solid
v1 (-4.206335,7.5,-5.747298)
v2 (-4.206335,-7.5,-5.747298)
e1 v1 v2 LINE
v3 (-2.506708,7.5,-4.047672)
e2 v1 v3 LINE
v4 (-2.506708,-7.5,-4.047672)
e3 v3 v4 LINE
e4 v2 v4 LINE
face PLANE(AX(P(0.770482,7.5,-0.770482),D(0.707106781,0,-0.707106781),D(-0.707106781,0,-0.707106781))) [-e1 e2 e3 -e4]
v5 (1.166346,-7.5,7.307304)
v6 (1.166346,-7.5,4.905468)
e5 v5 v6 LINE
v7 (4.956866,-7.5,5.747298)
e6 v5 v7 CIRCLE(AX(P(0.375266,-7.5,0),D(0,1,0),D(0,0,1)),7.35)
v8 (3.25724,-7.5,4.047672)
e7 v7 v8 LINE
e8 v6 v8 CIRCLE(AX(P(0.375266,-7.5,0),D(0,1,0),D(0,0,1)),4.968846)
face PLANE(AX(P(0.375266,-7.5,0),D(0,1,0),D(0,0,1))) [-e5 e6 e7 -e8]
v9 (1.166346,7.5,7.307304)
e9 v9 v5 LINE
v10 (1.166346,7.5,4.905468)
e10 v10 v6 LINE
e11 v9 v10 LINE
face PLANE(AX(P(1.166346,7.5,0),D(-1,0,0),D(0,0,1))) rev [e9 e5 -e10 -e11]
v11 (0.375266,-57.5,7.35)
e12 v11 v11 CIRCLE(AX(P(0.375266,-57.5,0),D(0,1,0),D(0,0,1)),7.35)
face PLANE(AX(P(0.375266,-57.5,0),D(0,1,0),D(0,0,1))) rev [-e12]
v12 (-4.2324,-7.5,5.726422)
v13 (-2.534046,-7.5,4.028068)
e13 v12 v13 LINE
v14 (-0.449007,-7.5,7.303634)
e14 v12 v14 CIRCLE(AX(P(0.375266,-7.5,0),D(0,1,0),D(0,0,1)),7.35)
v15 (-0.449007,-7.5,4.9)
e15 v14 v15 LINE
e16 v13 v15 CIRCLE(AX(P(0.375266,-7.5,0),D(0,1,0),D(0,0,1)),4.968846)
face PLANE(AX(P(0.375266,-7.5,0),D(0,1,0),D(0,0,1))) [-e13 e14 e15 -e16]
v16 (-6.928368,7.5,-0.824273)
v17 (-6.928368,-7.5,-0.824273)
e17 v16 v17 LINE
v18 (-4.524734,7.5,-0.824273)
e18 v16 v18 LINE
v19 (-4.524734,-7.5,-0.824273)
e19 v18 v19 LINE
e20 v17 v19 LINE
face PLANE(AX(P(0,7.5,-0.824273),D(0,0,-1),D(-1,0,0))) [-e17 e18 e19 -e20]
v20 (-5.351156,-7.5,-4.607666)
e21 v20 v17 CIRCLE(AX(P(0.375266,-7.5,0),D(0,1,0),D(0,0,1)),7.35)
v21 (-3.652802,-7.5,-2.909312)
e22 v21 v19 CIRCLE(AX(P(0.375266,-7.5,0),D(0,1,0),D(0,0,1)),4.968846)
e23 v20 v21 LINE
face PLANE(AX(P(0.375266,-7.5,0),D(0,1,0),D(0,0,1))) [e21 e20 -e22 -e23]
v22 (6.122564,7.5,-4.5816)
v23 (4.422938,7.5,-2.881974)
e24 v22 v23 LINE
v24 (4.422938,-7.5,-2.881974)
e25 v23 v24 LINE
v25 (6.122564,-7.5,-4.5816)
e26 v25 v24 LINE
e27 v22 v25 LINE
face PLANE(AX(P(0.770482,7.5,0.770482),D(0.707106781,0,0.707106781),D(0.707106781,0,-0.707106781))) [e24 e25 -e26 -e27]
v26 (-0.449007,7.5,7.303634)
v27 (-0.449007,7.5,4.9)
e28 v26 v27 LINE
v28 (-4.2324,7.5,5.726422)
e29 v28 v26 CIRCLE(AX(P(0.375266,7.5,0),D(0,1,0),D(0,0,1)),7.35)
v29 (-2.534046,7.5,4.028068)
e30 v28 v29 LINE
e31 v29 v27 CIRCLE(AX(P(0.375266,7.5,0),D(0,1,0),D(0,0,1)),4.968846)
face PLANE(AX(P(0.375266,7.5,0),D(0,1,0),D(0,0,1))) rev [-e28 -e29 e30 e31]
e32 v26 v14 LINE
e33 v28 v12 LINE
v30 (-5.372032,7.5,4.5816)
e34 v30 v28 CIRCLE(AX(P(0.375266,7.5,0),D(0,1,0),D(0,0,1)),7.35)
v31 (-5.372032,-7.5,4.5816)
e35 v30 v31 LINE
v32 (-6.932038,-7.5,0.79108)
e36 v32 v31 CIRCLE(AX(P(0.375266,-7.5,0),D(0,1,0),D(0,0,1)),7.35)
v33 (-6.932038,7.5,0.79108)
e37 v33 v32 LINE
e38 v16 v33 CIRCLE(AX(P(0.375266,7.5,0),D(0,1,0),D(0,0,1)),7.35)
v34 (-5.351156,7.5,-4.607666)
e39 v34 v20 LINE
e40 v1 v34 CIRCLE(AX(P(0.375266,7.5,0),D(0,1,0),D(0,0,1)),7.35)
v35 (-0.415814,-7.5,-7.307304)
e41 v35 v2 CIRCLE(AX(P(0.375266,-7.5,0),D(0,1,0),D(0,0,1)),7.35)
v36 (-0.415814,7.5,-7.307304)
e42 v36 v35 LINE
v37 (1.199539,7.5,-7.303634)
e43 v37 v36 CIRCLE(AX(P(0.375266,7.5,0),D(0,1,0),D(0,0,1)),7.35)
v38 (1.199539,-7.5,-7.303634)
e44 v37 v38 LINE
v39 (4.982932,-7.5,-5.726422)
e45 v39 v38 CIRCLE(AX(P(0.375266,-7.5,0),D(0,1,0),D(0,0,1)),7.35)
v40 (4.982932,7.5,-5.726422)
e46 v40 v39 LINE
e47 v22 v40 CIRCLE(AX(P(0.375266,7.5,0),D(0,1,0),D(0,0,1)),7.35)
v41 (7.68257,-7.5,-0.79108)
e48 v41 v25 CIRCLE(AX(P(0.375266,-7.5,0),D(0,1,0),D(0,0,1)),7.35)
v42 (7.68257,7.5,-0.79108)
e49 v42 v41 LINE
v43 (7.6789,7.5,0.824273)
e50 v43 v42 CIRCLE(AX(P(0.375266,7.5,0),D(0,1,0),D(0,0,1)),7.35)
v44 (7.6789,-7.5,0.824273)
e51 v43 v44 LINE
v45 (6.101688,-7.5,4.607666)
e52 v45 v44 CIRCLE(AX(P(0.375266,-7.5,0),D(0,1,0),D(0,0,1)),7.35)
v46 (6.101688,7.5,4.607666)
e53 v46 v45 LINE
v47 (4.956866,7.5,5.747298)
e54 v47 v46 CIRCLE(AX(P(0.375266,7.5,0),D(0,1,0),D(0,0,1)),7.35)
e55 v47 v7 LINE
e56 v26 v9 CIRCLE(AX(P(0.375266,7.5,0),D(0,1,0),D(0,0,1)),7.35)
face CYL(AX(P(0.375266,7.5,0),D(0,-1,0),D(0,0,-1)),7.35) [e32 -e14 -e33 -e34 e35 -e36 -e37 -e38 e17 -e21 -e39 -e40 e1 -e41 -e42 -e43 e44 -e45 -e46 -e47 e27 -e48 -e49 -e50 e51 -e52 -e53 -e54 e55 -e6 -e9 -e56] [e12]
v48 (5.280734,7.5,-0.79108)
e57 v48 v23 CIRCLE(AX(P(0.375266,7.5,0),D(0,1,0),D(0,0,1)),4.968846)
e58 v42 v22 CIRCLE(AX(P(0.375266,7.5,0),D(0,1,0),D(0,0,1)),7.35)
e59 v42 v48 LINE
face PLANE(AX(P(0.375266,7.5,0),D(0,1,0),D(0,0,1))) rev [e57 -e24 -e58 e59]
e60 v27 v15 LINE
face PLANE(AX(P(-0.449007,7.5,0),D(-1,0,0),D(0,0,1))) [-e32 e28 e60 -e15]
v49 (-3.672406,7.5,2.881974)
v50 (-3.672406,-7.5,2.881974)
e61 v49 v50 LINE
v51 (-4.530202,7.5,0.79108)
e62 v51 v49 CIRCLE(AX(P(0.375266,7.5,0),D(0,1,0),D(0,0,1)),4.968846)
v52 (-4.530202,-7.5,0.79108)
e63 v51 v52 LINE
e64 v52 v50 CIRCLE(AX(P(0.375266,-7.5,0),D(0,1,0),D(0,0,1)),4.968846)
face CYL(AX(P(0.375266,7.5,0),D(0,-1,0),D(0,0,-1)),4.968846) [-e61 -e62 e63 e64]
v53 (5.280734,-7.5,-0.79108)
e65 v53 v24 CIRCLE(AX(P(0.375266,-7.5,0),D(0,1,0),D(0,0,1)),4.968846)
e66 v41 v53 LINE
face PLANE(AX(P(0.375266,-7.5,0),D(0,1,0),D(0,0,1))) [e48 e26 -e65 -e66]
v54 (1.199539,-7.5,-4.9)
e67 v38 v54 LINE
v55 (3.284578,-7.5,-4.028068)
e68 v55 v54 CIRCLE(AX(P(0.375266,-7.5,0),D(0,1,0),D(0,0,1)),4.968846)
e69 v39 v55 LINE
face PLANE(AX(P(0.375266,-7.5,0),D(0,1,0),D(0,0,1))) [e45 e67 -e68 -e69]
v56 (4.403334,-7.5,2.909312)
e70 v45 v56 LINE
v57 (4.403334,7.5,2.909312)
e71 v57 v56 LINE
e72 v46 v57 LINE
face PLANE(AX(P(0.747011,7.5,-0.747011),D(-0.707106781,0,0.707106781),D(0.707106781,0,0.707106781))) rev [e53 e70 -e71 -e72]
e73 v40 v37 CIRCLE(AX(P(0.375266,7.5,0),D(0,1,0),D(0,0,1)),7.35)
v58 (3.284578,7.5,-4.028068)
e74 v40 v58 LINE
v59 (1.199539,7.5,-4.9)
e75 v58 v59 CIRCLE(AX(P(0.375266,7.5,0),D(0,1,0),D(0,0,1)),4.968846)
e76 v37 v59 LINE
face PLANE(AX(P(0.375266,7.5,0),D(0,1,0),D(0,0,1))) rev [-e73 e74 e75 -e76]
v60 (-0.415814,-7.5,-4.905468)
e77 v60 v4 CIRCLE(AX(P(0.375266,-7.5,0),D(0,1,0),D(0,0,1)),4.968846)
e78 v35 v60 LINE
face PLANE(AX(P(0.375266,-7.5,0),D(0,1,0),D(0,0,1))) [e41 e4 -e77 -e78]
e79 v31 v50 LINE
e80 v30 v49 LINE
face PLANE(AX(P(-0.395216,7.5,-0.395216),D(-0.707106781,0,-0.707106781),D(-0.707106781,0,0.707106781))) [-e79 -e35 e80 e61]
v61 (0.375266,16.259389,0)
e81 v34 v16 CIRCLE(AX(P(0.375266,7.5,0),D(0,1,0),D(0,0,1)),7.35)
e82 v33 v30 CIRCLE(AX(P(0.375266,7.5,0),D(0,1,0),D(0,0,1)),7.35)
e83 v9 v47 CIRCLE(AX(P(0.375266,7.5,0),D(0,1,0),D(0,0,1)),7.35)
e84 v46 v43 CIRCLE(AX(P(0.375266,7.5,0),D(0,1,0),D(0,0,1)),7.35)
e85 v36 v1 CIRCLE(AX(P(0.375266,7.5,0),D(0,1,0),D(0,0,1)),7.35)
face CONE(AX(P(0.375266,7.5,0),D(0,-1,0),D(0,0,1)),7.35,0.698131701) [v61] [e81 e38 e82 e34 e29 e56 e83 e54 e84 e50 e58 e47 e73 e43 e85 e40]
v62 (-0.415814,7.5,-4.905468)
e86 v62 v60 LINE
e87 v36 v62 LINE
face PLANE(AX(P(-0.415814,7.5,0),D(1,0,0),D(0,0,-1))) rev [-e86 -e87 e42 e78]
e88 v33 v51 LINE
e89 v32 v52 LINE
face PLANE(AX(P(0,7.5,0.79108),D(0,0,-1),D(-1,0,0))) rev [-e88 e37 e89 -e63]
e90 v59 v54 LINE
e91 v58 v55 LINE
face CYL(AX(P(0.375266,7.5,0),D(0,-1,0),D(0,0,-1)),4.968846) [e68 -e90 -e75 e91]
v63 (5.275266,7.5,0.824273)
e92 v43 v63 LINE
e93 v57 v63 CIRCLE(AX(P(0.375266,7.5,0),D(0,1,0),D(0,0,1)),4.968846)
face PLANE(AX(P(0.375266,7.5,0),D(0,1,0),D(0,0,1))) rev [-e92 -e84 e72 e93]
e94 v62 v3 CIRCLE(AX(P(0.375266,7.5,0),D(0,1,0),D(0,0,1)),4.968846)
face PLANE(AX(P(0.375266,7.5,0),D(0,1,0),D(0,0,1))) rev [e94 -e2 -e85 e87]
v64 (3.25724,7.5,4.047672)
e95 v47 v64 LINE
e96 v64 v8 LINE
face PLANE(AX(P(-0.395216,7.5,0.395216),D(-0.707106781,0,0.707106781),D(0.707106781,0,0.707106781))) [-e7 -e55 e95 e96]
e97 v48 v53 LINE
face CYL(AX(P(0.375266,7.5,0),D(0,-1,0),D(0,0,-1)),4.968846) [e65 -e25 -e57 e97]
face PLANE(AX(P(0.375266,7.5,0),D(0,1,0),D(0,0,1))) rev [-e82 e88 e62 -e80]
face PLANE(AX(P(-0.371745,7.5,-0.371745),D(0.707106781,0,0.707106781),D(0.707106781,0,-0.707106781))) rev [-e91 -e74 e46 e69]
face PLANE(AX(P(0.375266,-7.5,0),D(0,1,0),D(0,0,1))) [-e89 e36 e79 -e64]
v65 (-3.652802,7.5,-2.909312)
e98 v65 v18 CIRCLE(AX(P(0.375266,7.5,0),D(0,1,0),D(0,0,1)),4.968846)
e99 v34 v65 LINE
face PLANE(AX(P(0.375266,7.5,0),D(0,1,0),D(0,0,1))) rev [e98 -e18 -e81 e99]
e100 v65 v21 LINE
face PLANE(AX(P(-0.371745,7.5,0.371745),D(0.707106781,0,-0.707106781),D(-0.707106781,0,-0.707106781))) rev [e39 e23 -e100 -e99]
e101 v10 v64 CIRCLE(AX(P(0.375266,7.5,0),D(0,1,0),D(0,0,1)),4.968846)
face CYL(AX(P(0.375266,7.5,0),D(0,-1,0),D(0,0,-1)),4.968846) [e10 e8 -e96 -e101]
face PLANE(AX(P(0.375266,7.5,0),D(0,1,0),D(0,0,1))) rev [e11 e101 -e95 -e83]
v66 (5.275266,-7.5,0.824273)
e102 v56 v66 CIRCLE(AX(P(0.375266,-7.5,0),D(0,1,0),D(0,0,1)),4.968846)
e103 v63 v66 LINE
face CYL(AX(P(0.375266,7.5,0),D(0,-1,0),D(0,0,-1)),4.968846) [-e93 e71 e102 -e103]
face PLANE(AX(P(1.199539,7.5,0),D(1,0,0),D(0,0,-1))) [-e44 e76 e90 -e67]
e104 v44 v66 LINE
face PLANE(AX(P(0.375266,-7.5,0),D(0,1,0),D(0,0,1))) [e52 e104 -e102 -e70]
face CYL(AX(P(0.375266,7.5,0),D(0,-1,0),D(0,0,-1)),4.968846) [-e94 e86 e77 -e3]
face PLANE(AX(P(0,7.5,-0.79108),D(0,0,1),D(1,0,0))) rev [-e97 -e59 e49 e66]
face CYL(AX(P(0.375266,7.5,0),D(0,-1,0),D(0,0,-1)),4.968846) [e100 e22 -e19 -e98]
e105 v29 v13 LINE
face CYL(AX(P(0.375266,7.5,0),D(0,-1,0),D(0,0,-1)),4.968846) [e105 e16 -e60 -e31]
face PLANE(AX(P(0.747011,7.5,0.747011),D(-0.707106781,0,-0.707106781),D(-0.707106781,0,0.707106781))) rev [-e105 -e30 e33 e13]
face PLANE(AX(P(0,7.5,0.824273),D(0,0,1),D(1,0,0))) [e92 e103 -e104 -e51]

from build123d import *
from build123d.topology import SkipClean

# Parameters (mm, degrees)
BOSS_EXTRUDE1_DEPTH = 7.5
BOSS_EXTRUDE3_START = -7.5
SKETCH1_7_R         = 7.35
BOSS_EXTRUDE3_DEPTH = 50


with BuildPart() as part:
    # Sketch1 → Boss-Extrude1 (new, symmetric)
    with BuildSketch(Plane(origin=(0, 0, 0), x_dir=(1, 0, 0), z_dir=(0, 1, 0))):
        with BuildLine():
            ThreePointArc((6.122564101, 4.581600452), (5.584294246, 5.185414455), (4.982932131, 5.726422213))
            Line((4.982932131, 5.726422213), (3.28457771, 4.028067792))
            ThreePointArc((3.28457771, 4.028067792), (2.292289605, 4.584151566), (1.199538666, 4.9))
            Line((1.199538666, 4.9), (1.199538666, 7.303634322))
            ThreePointArc((1.199538666, 7.303634322), (0.391963425, 7.349981033), (-0.415814059, 7.307304058))
            Line((-0.415814059, 7.307304058), (-0.415814059, 4.905468202))
            ThreePointArc((-0.415814059, 4.905468202), (-1.510678314, 4.597025162), (-2.506708483, 4.047672132))
            Line((-2.506708483, 4.047672132), (-4.206334611, 5.747298261))
            ThreePointArc((-4.206334611, 5.747298261), (-4.810148615, 5.209028406), (-5.351156372, 4.60766629))
            Line((-5.351156372, 4.60766629), (-3.652801952, 2.909311869))
            ThreePointArc((-3.652801952, 2.909311869), (-4.208885725, 1.917023764), (-4.524734159, 0.824272826))
            Line((-4.524734159, 0.824272826), (-6.928368481, 0.824272826))
            ThreePointArc((-6.928368481, 0.824272826), (-6.974715193, 0.016697585), (-6.932038217, -0.791079899))
            Line((-6.932038217, -0.791079899), (-4.530202362, -0.791079899))
            ThreePointArc((-4.530202362, -0.791079899), (-4.221759321, -1.885944155), (-3.672406292, -2.881974323))
            Line((-3.672406292, -2.881974323), (-5.37203242, -4.581600452))
            ThreePointArc((-5.37203242, -4.581600452), (-4.833762565, -5.185414455), (-4.23240045, -5.726422213))
            Line((-4.23240045, -5.726422213), (-2.534046029, -4.028067792))
            ThreePointArc((-2.534046029, -4.028067792), (-1.541757924, -4.584151566), (-0.449006985, -4.9))
            Line((-0.449006985, -4.9), (-0.449006985, -7.303634322))
            ThreePointArc((-0.449006985, -7.303634322), (0.358568256, -7.349981033), (1.16634574, -7.307304058))
            Line((1.16634574, -7.307304058), (1.16634574, -4.905468202))
            ThreePointArc((1.16634574, -4.905468202), (2.261209995, -4.597025162), (3.257240164, -4.047672132))
            Line((3.257240164, -4.047672132), (4.956866292, -5.747298261))
            ThreePointArc((4.956866292, -5.747298261), (5.560680296, -5.209028406), (6.101688053, -4.60766629))
            Line((6.101688053, -4.60766629), (4.403333633, -2.909311869))
            ThreePointArc((4.403333633, -2.909311869), (4.959417406, -1.917023764), (5.275265841, -0.824272826))
            Line((5.275265841, -0.824272826), (7.678900162, -0.824272826))
            ThreePointArc((7.678900162, -0.824272826), (7.725246874, -0.016697585), (7.682569898, 0.791079899))
            Line((7.682569898, 0.791079899), (5.280734043, 0.791079899))
            ThreePointArc((5.280734043, 0.791079899), (4.972291002, 1.885944155), (4.422937973, 2.881974323))
            Line((4.422937973, 2.881974323), (6.122564101, 4.581600452))
        make_face()
    extrude(amount=BOSS_EXTRUDE1_DEPTH, both=True)

    # Boss-Extrude2 cone 1 section (through the dimple's axis) → Boss-Extrude2 (revolve)
    with BuildSketch(Plane(origin=(0.375265841, 7.5, 0), x_dir=(0, 0, -1), z_dir=(1, 0, 0))):
        Polygon((0, 0), (7.35, 0), (0, 8.759388906), align=None)
    revolve(axis=Axis((0.375265841, 7.5, 0), (0, 1, 0)))

    # Sketch1<7> → Boss-Extrude3 (add)
    with SkipClean():  # the faces are left unmerged after this step: merging them gives an invalid solid
        with BuildSketch(Plane(origin=(0, 0, 0), x_dir=(1, 0, 0), z_dir=(0, 1, 0)).offset(BOSS_EXTRUDE3_START)):
            with Locations(Location((0.375265841, 0, 0), (0, 0, 96.178708688))):
                Circle(SKETCH1_7_R)
        extrude(amount=-BOSS_EXTRUDE3_DEPTH)


solid = part.part
